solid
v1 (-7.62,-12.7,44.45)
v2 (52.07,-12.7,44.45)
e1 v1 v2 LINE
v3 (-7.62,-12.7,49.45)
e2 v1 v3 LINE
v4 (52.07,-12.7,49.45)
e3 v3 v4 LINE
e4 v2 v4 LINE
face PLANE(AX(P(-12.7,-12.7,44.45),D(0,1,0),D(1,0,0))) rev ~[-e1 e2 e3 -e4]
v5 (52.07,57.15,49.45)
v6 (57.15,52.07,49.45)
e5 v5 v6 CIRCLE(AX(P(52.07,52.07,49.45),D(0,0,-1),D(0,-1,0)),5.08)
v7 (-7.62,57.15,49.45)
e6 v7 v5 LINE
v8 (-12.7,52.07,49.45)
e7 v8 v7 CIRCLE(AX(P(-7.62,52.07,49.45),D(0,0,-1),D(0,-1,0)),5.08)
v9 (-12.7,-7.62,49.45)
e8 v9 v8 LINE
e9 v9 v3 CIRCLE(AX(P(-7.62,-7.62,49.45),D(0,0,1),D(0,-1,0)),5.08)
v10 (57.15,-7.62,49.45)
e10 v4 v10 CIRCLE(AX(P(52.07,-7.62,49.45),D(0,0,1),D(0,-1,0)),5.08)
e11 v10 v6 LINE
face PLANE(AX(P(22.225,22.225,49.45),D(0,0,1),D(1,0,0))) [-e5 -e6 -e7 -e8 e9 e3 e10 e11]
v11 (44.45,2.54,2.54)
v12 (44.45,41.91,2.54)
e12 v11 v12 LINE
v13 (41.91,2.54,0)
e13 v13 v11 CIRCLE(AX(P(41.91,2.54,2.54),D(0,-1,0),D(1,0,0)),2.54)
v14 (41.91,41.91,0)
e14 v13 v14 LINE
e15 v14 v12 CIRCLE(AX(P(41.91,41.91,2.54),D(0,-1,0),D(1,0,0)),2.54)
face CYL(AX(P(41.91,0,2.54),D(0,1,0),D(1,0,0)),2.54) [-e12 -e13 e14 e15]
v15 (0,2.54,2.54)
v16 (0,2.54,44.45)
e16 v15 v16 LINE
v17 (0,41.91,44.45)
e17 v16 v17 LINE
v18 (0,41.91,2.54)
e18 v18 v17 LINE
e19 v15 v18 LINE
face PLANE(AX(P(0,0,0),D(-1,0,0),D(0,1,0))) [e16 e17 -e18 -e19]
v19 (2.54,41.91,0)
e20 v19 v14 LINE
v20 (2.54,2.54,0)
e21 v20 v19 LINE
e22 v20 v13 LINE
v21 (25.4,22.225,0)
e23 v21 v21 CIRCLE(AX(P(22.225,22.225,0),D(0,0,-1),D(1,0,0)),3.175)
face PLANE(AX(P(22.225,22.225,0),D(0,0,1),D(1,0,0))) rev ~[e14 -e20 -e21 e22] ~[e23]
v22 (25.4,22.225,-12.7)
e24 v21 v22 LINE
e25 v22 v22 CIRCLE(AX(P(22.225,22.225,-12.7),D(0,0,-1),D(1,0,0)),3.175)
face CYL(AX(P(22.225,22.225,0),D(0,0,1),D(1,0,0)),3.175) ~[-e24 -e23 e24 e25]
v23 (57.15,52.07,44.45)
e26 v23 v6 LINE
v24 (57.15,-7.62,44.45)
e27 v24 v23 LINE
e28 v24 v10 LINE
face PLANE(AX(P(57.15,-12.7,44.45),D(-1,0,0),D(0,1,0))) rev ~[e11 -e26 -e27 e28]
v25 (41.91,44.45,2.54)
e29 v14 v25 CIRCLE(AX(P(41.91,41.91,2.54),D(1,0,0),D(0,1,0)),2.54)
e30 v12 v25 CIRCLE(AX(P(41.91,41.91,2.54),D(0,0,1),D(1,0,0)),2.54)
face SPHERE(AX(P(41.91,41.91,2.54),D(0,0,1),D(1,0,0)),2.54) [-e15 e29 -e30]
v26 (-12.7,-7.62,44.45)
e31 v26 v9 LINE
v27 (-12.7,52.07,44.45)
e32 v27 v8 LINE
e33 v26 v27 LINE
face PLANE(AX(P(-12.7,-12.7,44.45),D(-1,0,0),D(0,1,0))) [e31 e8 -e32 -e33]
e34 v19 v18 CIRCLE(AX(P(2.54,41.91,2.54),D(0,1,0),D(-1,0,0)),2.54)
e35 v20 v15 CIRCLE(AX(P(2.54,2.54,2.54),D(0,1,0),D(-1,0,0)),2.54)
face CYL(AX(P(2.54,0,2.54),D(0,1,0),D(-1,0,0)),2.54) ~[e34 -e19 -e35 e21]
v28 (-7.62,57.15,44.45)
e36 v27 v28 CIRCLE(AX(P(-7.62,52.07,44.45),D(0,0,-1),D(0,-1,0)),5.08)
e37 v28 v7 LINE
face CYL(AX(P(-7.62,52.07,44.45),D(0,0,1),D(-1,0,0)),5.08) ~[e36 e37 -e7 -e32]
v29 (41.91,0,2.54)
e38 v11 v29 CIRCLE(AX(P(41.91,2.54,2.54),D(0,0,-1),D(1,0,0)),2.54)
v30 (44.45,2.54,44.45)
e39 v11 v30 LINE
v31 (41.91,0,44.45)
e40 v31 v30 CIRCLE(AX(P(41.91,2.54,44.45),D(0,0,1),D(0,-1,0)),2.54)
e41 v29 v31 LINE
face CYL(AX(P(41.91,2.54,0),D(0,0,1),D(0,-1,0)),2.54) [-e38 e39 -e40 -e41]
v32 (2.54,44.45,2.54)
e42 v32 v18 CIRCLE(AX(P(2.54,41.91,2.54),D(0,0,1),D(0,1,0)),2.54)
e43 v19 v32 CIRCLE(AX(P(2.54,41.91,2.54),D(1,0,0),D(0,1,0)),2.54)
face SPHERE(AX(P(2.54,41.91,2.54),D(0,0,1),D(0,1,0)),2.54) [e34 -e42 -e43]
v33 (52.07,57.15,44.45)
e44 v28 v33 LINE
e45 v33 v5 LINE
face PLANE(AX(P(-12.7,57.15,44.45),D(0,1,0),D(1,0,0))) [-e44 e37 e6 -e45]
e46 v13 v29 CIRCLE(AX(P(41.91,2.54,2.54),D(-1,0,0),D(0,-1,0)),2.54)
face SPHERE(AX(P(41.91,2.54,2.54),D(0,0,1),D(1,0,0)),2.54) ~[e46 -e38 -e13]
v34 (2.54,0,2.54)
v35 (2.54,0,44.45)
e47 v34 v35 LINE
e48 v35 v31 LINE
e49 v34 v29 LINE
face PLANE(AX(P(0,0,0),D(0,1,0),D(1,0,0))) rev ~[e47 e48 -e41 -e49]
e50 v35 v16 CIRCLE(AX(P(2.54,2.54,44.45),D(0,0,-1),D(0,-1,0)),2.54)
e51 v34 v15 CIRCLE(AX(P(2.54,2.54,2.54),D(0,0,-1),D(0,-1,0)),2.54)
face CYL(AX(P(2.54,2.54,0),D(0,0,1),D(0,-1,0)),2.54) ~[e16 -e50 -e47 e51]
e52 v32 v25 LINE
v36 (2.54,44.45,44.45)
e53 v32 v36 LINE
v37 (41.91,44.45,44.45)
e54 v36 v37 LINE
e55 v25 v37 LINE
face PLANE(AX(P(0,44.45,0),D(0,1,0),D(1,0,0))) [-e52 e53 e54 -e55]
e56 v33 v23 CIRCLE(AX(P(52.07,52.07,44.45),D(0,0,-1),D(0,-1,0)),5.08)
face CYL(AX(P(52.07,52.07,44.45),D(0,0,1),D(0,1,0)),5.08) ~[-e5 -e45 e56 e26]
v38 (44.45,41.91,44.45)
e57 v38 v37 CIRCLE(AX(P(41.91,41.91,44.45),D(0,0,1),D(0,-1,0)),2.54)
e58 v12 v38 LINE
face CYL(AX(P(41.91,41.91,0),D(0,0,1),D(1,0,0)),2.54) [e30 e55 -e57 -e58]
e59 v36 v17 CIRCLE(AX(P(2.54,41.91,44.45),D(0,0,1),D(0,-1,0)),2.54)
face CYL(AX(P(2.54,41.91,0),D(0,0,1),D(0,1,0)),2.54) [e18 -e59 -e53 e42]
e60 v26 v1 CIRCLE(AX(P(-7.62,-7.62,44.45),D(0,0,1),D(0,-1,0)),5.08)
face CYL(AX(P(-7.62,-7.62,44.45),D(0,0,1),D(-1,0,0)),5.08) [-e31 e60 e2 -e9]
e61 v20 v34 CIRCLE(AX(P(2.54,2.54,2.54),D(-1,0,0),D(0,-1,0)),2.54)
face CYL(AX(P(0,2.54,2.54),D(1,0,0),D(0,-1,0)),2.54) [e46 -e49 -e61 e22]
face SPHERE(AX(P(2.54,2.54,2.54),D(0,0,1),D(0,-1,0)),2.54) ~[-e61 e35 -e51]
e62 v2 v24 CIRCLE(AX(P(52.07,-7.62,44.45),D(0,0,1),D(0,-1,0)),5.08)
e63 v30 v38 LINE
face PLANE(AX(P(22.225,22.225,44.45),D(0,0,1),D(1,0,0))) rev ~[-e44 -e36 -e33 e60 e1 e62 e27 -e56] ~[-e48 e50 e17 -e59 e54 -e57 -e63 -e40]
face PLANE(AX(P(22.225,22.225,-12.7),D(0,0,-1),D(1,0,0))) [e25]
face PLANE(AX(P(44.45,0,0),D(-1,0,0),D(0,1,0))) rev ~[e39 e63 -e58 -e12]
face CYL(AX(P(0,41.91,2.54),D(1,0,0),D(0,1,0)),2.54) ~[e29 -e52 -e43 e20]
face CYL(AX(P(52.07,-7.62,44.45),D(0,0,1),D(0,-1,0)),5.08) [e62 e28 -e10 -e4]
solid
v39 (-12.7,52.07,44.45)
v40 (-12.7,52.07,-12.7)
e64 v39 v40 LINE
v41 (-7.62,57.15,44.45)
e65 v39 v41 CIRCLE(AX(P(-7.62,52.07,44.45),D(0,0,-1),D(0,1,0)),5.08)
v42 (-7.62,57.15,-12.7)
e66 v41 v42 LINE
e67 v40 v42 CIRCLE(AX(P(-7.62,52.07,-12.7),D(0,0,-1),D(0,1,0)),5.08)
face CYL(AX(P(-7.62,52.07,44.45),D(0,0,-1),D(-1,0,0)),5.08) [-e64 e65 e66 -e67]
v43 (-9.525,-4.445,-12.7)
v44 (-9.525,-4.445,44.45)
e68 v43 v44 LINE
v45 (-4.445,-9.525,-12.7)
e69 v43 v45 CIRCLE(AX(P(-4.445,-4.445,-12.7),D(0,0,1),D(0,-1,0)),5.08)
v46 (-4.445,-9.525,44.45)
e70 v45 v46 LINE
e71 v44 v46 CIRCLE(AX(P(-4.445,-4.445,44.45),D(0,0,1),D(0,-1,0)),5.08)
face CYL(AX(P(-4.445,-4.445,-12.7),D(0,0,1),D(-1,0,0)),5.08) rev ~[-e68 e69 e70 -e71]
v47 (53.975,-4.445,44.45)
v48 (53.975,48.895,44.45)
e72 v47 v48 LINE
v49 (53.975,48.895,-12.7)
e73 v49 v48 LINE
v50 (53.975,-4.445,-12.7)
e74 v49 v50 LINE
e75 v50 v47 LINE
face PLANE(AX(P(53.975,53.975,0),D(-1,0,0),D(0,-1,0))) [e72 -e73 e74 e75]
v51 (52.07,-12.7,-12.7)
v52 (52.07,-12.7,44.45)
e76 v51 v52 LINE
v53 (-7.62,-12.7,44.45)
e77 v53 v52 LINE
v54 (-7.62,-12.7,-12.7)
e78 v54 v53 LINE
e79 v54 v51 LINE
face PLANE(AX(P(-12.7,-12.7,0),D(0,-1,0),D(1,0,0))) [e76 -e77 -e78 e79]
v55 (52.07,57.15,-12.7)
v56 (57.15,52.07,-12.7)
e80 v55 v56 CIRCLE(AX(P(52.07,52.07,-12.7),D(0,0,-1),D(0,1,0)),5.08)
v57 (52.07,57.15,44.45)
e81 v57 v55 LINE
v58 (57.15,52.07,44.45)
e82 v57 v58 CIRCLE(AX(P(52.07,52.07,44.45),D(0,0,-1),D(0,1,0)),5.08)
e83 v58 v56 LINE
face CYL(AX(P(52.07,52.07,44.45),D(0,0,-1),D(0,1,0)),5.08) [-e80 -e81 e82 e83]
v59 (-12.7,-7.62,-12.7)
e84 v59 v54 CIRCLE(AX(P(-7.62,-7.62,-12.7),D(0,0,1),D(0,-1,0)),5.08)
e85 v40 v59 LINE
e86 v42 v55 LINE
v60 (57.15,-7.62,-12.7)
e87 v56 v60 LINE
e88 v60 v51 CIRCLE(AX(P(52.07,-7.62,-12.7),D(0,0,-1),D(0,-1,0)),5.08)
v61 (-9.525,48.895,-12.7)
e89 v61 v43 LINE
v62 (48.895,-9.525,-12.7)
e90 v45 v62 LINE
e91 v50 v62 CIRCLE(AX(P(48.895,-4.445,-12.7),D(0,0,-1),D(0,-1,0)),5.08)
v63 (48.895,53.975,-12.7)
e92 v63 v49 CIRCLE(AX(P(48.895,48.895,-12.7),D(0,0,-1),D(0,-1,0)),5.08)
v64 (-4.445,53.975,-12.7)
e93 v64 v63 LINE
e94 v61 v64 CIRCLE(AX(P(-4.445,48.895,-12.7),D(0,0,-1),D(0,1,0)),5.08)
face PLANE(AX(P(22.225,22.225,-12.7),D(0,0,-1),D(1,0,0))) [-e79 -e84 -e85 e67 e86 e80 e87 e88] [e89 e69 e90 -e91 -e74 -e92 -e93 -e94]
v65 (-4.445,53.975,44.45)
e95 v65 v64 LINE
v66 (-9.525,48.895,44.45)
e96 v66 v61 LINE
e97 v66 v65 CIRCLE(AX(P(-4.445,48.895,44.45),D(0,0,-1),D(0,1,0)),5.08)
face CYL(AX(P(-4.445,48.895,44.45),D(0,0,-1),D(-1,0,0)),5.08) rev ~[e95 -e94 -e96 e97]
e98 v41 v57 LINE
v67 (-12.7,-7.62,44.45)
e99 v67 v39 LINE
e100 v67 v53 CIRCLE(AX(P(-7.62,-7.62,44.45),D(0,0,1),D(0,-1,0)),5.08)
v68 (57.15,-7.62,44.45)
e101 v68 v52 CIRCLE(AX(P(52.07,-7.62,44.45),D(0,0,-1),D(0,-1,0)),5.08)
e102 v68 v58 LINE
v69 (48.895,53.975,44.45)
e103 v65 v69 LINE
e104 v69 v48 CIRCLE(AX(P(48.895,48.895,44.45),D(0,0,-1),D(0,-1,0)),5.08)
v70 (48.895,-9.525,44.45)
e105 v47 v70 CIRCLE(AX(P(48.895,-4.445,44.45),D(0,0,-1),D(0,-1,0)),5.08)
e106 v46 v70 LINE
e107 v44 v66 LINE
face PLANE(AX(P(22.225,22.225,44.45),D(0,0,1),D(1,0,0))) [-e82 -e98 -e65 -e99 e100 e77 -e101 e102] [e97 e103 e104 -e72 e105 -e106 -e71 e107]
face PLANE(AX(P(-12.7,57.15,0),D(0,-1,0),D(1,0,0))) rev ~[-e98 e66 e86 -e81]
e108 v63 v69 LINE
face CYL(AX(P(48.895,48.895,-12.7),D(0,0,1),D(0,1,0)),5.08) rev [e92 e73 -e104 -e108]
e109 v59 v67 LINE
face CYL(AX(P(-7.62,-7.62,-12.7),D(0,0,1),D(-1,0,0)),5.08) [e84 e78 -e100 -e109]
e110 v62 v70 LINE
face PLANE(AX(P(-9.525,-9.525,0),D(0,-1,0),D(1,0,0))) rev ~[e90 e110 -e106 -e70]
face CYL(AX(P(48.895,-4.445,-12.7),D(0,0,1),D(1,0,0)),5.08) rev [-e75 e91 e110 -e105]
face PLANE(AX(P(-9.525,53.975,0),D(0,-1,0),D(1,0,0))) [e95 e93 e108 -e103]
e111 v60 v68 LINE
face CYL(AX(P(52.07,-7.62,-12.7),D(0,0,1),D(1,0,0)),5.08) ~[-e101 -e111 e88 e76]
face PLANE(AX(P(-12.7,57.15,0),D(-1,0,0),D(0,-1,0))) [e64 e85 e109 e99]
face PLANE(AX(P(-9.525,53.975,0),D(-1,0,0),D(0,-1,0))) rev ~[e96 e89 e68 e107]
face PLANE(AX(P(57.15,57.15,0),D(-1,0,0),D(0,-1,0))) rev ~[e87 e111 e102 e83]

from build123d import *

# Parameters (mm, degrees)
F0_W      = 69.85
F0_H      = 69.85
F0_W_2    = 63.5
F0_H_2    = 63.5
F1_DEPTH  = 44.45
F0_W_3    = 44.45
F0_H_3    = 44.45
F2_W      = 69.85
F2_H      = 69.85
F3_DEPTH  = 5
F4_W      = 69.85
F4_H      = 69.85
F4_W_2    = 63.5
F4_H_2    = 63.5
F5_DEPTH  = 12.7
F6_R      = 5.08
F6_2_R    = 5.08
F7_R      = 2.54
F8_R      = 5.08
F9_R      = 3.175
F10_DEPTH = 12.7


with BuildPart() as f1:
    # F0 (on Top) → F1 (new body)
    with BuildSketch(Plane.XY):
        with Locations((22.225, 22.225)):
            Rectangle(F0_W, F0_H)
        with Locations((22.225, 22.225)):
            Rectangle(F0_W_2, F0_H_2, mode=Mode.SUBTRACT)
    extrude(amount=F1_DEPTH)

    # F4 (on face) → F5 (join)
    with BuildSketch(Plane(origin=(0, 0, 0), x_dir=(1, 0, 0), z_dir=(0, 0, -1))):
        with Locations((22.225, -22.225)):
            Rectangle(F4_W, F4_H)
        with Locations((22.225, -22.225)):
            Rectangle(F4_W_2, F4_H_2, mode=Mode.SUBTRACT)
    extrude(amount=F5_DEPTH)

    # F6
    f6_edges = [f1.edges().sort_by_distance(p)[0] for p in [
        (53.975, -9.525, 15.875),
        (-9.525, -9.525, 15.875),
        (-9.525, 53.975, 15.875),
        (53.975, 53.975, 15.875),
        (-12.7, -12.7, 15.875),
        (-12.7, 57.15, 15.875),
        (57.15, 57.15, 15.875),
        (57.15, -12.7, 15.875),
    ]]
    fillet(f6_edges, radius=F6_R)


with BuildPart() as f1b:
    # F0 (on Top) → F1, piece 2 (new body)
    with BuildSketch(Plane.XY):
        with Locations((22.225, 22.225)):
            Rectangle(F0_W_3, F0_H_3)
    extrude(amount=F1_DEPTH)

    # F2 (on face) → F3 (join)
    with BuildSketch(Plane.XY.offset(44.45)):
        with Locations((22.225, 22.225)):
            Rectangle(F2_W, F2_H)
    extrude(amount=F3_DEPTH)

    # F6#2
    f6_2_edges = [f1b.edges().sort_by_distance(p)[0] for p in [
        (-12.7, -12.7, 46.95),
    ]]
    fillet(f6_2_edges, radius=F6_2_R)

    # F7
    f7_edges = [f1b.edges().sort_by_distance(p)[0] for p in [
        (0, 0, 22.225),
        (44.45, 0, 22.225),
        (0, 44.45, 22.225),
        (44.45, 44.45, 22.225),
        (44.45, 22.225, 0),
        (22.225, 44.45, 0),
        (22.225, 0, 0),
        (0, 22.225, 0),
    ]]
    fillet(f7_edges, radius=F7_R)

    # F8
    f8_edges = [f1b.edges().sort_by_distance(p)[0] for p in [
        (57.15, 57.15, 46.95),
        (-12.7, 57.15, 46.95),
        (57.15, -12.7, 46.95),
    ]]
    fillet(f8_edges, radius=F8_R)

    # F9 (on face) → F10 (join)
    with BuildSketch(Plane(origin=(0, 0, 0), x_dir=(1, 0, 0), z_dir=(0, 0, -1))):
        with Locations((22.225, -22.225)):
            Circle(F9_R)
    extrude(amount=F10_DEPTH)


solid = Compound([f1.part, f1b.part])
